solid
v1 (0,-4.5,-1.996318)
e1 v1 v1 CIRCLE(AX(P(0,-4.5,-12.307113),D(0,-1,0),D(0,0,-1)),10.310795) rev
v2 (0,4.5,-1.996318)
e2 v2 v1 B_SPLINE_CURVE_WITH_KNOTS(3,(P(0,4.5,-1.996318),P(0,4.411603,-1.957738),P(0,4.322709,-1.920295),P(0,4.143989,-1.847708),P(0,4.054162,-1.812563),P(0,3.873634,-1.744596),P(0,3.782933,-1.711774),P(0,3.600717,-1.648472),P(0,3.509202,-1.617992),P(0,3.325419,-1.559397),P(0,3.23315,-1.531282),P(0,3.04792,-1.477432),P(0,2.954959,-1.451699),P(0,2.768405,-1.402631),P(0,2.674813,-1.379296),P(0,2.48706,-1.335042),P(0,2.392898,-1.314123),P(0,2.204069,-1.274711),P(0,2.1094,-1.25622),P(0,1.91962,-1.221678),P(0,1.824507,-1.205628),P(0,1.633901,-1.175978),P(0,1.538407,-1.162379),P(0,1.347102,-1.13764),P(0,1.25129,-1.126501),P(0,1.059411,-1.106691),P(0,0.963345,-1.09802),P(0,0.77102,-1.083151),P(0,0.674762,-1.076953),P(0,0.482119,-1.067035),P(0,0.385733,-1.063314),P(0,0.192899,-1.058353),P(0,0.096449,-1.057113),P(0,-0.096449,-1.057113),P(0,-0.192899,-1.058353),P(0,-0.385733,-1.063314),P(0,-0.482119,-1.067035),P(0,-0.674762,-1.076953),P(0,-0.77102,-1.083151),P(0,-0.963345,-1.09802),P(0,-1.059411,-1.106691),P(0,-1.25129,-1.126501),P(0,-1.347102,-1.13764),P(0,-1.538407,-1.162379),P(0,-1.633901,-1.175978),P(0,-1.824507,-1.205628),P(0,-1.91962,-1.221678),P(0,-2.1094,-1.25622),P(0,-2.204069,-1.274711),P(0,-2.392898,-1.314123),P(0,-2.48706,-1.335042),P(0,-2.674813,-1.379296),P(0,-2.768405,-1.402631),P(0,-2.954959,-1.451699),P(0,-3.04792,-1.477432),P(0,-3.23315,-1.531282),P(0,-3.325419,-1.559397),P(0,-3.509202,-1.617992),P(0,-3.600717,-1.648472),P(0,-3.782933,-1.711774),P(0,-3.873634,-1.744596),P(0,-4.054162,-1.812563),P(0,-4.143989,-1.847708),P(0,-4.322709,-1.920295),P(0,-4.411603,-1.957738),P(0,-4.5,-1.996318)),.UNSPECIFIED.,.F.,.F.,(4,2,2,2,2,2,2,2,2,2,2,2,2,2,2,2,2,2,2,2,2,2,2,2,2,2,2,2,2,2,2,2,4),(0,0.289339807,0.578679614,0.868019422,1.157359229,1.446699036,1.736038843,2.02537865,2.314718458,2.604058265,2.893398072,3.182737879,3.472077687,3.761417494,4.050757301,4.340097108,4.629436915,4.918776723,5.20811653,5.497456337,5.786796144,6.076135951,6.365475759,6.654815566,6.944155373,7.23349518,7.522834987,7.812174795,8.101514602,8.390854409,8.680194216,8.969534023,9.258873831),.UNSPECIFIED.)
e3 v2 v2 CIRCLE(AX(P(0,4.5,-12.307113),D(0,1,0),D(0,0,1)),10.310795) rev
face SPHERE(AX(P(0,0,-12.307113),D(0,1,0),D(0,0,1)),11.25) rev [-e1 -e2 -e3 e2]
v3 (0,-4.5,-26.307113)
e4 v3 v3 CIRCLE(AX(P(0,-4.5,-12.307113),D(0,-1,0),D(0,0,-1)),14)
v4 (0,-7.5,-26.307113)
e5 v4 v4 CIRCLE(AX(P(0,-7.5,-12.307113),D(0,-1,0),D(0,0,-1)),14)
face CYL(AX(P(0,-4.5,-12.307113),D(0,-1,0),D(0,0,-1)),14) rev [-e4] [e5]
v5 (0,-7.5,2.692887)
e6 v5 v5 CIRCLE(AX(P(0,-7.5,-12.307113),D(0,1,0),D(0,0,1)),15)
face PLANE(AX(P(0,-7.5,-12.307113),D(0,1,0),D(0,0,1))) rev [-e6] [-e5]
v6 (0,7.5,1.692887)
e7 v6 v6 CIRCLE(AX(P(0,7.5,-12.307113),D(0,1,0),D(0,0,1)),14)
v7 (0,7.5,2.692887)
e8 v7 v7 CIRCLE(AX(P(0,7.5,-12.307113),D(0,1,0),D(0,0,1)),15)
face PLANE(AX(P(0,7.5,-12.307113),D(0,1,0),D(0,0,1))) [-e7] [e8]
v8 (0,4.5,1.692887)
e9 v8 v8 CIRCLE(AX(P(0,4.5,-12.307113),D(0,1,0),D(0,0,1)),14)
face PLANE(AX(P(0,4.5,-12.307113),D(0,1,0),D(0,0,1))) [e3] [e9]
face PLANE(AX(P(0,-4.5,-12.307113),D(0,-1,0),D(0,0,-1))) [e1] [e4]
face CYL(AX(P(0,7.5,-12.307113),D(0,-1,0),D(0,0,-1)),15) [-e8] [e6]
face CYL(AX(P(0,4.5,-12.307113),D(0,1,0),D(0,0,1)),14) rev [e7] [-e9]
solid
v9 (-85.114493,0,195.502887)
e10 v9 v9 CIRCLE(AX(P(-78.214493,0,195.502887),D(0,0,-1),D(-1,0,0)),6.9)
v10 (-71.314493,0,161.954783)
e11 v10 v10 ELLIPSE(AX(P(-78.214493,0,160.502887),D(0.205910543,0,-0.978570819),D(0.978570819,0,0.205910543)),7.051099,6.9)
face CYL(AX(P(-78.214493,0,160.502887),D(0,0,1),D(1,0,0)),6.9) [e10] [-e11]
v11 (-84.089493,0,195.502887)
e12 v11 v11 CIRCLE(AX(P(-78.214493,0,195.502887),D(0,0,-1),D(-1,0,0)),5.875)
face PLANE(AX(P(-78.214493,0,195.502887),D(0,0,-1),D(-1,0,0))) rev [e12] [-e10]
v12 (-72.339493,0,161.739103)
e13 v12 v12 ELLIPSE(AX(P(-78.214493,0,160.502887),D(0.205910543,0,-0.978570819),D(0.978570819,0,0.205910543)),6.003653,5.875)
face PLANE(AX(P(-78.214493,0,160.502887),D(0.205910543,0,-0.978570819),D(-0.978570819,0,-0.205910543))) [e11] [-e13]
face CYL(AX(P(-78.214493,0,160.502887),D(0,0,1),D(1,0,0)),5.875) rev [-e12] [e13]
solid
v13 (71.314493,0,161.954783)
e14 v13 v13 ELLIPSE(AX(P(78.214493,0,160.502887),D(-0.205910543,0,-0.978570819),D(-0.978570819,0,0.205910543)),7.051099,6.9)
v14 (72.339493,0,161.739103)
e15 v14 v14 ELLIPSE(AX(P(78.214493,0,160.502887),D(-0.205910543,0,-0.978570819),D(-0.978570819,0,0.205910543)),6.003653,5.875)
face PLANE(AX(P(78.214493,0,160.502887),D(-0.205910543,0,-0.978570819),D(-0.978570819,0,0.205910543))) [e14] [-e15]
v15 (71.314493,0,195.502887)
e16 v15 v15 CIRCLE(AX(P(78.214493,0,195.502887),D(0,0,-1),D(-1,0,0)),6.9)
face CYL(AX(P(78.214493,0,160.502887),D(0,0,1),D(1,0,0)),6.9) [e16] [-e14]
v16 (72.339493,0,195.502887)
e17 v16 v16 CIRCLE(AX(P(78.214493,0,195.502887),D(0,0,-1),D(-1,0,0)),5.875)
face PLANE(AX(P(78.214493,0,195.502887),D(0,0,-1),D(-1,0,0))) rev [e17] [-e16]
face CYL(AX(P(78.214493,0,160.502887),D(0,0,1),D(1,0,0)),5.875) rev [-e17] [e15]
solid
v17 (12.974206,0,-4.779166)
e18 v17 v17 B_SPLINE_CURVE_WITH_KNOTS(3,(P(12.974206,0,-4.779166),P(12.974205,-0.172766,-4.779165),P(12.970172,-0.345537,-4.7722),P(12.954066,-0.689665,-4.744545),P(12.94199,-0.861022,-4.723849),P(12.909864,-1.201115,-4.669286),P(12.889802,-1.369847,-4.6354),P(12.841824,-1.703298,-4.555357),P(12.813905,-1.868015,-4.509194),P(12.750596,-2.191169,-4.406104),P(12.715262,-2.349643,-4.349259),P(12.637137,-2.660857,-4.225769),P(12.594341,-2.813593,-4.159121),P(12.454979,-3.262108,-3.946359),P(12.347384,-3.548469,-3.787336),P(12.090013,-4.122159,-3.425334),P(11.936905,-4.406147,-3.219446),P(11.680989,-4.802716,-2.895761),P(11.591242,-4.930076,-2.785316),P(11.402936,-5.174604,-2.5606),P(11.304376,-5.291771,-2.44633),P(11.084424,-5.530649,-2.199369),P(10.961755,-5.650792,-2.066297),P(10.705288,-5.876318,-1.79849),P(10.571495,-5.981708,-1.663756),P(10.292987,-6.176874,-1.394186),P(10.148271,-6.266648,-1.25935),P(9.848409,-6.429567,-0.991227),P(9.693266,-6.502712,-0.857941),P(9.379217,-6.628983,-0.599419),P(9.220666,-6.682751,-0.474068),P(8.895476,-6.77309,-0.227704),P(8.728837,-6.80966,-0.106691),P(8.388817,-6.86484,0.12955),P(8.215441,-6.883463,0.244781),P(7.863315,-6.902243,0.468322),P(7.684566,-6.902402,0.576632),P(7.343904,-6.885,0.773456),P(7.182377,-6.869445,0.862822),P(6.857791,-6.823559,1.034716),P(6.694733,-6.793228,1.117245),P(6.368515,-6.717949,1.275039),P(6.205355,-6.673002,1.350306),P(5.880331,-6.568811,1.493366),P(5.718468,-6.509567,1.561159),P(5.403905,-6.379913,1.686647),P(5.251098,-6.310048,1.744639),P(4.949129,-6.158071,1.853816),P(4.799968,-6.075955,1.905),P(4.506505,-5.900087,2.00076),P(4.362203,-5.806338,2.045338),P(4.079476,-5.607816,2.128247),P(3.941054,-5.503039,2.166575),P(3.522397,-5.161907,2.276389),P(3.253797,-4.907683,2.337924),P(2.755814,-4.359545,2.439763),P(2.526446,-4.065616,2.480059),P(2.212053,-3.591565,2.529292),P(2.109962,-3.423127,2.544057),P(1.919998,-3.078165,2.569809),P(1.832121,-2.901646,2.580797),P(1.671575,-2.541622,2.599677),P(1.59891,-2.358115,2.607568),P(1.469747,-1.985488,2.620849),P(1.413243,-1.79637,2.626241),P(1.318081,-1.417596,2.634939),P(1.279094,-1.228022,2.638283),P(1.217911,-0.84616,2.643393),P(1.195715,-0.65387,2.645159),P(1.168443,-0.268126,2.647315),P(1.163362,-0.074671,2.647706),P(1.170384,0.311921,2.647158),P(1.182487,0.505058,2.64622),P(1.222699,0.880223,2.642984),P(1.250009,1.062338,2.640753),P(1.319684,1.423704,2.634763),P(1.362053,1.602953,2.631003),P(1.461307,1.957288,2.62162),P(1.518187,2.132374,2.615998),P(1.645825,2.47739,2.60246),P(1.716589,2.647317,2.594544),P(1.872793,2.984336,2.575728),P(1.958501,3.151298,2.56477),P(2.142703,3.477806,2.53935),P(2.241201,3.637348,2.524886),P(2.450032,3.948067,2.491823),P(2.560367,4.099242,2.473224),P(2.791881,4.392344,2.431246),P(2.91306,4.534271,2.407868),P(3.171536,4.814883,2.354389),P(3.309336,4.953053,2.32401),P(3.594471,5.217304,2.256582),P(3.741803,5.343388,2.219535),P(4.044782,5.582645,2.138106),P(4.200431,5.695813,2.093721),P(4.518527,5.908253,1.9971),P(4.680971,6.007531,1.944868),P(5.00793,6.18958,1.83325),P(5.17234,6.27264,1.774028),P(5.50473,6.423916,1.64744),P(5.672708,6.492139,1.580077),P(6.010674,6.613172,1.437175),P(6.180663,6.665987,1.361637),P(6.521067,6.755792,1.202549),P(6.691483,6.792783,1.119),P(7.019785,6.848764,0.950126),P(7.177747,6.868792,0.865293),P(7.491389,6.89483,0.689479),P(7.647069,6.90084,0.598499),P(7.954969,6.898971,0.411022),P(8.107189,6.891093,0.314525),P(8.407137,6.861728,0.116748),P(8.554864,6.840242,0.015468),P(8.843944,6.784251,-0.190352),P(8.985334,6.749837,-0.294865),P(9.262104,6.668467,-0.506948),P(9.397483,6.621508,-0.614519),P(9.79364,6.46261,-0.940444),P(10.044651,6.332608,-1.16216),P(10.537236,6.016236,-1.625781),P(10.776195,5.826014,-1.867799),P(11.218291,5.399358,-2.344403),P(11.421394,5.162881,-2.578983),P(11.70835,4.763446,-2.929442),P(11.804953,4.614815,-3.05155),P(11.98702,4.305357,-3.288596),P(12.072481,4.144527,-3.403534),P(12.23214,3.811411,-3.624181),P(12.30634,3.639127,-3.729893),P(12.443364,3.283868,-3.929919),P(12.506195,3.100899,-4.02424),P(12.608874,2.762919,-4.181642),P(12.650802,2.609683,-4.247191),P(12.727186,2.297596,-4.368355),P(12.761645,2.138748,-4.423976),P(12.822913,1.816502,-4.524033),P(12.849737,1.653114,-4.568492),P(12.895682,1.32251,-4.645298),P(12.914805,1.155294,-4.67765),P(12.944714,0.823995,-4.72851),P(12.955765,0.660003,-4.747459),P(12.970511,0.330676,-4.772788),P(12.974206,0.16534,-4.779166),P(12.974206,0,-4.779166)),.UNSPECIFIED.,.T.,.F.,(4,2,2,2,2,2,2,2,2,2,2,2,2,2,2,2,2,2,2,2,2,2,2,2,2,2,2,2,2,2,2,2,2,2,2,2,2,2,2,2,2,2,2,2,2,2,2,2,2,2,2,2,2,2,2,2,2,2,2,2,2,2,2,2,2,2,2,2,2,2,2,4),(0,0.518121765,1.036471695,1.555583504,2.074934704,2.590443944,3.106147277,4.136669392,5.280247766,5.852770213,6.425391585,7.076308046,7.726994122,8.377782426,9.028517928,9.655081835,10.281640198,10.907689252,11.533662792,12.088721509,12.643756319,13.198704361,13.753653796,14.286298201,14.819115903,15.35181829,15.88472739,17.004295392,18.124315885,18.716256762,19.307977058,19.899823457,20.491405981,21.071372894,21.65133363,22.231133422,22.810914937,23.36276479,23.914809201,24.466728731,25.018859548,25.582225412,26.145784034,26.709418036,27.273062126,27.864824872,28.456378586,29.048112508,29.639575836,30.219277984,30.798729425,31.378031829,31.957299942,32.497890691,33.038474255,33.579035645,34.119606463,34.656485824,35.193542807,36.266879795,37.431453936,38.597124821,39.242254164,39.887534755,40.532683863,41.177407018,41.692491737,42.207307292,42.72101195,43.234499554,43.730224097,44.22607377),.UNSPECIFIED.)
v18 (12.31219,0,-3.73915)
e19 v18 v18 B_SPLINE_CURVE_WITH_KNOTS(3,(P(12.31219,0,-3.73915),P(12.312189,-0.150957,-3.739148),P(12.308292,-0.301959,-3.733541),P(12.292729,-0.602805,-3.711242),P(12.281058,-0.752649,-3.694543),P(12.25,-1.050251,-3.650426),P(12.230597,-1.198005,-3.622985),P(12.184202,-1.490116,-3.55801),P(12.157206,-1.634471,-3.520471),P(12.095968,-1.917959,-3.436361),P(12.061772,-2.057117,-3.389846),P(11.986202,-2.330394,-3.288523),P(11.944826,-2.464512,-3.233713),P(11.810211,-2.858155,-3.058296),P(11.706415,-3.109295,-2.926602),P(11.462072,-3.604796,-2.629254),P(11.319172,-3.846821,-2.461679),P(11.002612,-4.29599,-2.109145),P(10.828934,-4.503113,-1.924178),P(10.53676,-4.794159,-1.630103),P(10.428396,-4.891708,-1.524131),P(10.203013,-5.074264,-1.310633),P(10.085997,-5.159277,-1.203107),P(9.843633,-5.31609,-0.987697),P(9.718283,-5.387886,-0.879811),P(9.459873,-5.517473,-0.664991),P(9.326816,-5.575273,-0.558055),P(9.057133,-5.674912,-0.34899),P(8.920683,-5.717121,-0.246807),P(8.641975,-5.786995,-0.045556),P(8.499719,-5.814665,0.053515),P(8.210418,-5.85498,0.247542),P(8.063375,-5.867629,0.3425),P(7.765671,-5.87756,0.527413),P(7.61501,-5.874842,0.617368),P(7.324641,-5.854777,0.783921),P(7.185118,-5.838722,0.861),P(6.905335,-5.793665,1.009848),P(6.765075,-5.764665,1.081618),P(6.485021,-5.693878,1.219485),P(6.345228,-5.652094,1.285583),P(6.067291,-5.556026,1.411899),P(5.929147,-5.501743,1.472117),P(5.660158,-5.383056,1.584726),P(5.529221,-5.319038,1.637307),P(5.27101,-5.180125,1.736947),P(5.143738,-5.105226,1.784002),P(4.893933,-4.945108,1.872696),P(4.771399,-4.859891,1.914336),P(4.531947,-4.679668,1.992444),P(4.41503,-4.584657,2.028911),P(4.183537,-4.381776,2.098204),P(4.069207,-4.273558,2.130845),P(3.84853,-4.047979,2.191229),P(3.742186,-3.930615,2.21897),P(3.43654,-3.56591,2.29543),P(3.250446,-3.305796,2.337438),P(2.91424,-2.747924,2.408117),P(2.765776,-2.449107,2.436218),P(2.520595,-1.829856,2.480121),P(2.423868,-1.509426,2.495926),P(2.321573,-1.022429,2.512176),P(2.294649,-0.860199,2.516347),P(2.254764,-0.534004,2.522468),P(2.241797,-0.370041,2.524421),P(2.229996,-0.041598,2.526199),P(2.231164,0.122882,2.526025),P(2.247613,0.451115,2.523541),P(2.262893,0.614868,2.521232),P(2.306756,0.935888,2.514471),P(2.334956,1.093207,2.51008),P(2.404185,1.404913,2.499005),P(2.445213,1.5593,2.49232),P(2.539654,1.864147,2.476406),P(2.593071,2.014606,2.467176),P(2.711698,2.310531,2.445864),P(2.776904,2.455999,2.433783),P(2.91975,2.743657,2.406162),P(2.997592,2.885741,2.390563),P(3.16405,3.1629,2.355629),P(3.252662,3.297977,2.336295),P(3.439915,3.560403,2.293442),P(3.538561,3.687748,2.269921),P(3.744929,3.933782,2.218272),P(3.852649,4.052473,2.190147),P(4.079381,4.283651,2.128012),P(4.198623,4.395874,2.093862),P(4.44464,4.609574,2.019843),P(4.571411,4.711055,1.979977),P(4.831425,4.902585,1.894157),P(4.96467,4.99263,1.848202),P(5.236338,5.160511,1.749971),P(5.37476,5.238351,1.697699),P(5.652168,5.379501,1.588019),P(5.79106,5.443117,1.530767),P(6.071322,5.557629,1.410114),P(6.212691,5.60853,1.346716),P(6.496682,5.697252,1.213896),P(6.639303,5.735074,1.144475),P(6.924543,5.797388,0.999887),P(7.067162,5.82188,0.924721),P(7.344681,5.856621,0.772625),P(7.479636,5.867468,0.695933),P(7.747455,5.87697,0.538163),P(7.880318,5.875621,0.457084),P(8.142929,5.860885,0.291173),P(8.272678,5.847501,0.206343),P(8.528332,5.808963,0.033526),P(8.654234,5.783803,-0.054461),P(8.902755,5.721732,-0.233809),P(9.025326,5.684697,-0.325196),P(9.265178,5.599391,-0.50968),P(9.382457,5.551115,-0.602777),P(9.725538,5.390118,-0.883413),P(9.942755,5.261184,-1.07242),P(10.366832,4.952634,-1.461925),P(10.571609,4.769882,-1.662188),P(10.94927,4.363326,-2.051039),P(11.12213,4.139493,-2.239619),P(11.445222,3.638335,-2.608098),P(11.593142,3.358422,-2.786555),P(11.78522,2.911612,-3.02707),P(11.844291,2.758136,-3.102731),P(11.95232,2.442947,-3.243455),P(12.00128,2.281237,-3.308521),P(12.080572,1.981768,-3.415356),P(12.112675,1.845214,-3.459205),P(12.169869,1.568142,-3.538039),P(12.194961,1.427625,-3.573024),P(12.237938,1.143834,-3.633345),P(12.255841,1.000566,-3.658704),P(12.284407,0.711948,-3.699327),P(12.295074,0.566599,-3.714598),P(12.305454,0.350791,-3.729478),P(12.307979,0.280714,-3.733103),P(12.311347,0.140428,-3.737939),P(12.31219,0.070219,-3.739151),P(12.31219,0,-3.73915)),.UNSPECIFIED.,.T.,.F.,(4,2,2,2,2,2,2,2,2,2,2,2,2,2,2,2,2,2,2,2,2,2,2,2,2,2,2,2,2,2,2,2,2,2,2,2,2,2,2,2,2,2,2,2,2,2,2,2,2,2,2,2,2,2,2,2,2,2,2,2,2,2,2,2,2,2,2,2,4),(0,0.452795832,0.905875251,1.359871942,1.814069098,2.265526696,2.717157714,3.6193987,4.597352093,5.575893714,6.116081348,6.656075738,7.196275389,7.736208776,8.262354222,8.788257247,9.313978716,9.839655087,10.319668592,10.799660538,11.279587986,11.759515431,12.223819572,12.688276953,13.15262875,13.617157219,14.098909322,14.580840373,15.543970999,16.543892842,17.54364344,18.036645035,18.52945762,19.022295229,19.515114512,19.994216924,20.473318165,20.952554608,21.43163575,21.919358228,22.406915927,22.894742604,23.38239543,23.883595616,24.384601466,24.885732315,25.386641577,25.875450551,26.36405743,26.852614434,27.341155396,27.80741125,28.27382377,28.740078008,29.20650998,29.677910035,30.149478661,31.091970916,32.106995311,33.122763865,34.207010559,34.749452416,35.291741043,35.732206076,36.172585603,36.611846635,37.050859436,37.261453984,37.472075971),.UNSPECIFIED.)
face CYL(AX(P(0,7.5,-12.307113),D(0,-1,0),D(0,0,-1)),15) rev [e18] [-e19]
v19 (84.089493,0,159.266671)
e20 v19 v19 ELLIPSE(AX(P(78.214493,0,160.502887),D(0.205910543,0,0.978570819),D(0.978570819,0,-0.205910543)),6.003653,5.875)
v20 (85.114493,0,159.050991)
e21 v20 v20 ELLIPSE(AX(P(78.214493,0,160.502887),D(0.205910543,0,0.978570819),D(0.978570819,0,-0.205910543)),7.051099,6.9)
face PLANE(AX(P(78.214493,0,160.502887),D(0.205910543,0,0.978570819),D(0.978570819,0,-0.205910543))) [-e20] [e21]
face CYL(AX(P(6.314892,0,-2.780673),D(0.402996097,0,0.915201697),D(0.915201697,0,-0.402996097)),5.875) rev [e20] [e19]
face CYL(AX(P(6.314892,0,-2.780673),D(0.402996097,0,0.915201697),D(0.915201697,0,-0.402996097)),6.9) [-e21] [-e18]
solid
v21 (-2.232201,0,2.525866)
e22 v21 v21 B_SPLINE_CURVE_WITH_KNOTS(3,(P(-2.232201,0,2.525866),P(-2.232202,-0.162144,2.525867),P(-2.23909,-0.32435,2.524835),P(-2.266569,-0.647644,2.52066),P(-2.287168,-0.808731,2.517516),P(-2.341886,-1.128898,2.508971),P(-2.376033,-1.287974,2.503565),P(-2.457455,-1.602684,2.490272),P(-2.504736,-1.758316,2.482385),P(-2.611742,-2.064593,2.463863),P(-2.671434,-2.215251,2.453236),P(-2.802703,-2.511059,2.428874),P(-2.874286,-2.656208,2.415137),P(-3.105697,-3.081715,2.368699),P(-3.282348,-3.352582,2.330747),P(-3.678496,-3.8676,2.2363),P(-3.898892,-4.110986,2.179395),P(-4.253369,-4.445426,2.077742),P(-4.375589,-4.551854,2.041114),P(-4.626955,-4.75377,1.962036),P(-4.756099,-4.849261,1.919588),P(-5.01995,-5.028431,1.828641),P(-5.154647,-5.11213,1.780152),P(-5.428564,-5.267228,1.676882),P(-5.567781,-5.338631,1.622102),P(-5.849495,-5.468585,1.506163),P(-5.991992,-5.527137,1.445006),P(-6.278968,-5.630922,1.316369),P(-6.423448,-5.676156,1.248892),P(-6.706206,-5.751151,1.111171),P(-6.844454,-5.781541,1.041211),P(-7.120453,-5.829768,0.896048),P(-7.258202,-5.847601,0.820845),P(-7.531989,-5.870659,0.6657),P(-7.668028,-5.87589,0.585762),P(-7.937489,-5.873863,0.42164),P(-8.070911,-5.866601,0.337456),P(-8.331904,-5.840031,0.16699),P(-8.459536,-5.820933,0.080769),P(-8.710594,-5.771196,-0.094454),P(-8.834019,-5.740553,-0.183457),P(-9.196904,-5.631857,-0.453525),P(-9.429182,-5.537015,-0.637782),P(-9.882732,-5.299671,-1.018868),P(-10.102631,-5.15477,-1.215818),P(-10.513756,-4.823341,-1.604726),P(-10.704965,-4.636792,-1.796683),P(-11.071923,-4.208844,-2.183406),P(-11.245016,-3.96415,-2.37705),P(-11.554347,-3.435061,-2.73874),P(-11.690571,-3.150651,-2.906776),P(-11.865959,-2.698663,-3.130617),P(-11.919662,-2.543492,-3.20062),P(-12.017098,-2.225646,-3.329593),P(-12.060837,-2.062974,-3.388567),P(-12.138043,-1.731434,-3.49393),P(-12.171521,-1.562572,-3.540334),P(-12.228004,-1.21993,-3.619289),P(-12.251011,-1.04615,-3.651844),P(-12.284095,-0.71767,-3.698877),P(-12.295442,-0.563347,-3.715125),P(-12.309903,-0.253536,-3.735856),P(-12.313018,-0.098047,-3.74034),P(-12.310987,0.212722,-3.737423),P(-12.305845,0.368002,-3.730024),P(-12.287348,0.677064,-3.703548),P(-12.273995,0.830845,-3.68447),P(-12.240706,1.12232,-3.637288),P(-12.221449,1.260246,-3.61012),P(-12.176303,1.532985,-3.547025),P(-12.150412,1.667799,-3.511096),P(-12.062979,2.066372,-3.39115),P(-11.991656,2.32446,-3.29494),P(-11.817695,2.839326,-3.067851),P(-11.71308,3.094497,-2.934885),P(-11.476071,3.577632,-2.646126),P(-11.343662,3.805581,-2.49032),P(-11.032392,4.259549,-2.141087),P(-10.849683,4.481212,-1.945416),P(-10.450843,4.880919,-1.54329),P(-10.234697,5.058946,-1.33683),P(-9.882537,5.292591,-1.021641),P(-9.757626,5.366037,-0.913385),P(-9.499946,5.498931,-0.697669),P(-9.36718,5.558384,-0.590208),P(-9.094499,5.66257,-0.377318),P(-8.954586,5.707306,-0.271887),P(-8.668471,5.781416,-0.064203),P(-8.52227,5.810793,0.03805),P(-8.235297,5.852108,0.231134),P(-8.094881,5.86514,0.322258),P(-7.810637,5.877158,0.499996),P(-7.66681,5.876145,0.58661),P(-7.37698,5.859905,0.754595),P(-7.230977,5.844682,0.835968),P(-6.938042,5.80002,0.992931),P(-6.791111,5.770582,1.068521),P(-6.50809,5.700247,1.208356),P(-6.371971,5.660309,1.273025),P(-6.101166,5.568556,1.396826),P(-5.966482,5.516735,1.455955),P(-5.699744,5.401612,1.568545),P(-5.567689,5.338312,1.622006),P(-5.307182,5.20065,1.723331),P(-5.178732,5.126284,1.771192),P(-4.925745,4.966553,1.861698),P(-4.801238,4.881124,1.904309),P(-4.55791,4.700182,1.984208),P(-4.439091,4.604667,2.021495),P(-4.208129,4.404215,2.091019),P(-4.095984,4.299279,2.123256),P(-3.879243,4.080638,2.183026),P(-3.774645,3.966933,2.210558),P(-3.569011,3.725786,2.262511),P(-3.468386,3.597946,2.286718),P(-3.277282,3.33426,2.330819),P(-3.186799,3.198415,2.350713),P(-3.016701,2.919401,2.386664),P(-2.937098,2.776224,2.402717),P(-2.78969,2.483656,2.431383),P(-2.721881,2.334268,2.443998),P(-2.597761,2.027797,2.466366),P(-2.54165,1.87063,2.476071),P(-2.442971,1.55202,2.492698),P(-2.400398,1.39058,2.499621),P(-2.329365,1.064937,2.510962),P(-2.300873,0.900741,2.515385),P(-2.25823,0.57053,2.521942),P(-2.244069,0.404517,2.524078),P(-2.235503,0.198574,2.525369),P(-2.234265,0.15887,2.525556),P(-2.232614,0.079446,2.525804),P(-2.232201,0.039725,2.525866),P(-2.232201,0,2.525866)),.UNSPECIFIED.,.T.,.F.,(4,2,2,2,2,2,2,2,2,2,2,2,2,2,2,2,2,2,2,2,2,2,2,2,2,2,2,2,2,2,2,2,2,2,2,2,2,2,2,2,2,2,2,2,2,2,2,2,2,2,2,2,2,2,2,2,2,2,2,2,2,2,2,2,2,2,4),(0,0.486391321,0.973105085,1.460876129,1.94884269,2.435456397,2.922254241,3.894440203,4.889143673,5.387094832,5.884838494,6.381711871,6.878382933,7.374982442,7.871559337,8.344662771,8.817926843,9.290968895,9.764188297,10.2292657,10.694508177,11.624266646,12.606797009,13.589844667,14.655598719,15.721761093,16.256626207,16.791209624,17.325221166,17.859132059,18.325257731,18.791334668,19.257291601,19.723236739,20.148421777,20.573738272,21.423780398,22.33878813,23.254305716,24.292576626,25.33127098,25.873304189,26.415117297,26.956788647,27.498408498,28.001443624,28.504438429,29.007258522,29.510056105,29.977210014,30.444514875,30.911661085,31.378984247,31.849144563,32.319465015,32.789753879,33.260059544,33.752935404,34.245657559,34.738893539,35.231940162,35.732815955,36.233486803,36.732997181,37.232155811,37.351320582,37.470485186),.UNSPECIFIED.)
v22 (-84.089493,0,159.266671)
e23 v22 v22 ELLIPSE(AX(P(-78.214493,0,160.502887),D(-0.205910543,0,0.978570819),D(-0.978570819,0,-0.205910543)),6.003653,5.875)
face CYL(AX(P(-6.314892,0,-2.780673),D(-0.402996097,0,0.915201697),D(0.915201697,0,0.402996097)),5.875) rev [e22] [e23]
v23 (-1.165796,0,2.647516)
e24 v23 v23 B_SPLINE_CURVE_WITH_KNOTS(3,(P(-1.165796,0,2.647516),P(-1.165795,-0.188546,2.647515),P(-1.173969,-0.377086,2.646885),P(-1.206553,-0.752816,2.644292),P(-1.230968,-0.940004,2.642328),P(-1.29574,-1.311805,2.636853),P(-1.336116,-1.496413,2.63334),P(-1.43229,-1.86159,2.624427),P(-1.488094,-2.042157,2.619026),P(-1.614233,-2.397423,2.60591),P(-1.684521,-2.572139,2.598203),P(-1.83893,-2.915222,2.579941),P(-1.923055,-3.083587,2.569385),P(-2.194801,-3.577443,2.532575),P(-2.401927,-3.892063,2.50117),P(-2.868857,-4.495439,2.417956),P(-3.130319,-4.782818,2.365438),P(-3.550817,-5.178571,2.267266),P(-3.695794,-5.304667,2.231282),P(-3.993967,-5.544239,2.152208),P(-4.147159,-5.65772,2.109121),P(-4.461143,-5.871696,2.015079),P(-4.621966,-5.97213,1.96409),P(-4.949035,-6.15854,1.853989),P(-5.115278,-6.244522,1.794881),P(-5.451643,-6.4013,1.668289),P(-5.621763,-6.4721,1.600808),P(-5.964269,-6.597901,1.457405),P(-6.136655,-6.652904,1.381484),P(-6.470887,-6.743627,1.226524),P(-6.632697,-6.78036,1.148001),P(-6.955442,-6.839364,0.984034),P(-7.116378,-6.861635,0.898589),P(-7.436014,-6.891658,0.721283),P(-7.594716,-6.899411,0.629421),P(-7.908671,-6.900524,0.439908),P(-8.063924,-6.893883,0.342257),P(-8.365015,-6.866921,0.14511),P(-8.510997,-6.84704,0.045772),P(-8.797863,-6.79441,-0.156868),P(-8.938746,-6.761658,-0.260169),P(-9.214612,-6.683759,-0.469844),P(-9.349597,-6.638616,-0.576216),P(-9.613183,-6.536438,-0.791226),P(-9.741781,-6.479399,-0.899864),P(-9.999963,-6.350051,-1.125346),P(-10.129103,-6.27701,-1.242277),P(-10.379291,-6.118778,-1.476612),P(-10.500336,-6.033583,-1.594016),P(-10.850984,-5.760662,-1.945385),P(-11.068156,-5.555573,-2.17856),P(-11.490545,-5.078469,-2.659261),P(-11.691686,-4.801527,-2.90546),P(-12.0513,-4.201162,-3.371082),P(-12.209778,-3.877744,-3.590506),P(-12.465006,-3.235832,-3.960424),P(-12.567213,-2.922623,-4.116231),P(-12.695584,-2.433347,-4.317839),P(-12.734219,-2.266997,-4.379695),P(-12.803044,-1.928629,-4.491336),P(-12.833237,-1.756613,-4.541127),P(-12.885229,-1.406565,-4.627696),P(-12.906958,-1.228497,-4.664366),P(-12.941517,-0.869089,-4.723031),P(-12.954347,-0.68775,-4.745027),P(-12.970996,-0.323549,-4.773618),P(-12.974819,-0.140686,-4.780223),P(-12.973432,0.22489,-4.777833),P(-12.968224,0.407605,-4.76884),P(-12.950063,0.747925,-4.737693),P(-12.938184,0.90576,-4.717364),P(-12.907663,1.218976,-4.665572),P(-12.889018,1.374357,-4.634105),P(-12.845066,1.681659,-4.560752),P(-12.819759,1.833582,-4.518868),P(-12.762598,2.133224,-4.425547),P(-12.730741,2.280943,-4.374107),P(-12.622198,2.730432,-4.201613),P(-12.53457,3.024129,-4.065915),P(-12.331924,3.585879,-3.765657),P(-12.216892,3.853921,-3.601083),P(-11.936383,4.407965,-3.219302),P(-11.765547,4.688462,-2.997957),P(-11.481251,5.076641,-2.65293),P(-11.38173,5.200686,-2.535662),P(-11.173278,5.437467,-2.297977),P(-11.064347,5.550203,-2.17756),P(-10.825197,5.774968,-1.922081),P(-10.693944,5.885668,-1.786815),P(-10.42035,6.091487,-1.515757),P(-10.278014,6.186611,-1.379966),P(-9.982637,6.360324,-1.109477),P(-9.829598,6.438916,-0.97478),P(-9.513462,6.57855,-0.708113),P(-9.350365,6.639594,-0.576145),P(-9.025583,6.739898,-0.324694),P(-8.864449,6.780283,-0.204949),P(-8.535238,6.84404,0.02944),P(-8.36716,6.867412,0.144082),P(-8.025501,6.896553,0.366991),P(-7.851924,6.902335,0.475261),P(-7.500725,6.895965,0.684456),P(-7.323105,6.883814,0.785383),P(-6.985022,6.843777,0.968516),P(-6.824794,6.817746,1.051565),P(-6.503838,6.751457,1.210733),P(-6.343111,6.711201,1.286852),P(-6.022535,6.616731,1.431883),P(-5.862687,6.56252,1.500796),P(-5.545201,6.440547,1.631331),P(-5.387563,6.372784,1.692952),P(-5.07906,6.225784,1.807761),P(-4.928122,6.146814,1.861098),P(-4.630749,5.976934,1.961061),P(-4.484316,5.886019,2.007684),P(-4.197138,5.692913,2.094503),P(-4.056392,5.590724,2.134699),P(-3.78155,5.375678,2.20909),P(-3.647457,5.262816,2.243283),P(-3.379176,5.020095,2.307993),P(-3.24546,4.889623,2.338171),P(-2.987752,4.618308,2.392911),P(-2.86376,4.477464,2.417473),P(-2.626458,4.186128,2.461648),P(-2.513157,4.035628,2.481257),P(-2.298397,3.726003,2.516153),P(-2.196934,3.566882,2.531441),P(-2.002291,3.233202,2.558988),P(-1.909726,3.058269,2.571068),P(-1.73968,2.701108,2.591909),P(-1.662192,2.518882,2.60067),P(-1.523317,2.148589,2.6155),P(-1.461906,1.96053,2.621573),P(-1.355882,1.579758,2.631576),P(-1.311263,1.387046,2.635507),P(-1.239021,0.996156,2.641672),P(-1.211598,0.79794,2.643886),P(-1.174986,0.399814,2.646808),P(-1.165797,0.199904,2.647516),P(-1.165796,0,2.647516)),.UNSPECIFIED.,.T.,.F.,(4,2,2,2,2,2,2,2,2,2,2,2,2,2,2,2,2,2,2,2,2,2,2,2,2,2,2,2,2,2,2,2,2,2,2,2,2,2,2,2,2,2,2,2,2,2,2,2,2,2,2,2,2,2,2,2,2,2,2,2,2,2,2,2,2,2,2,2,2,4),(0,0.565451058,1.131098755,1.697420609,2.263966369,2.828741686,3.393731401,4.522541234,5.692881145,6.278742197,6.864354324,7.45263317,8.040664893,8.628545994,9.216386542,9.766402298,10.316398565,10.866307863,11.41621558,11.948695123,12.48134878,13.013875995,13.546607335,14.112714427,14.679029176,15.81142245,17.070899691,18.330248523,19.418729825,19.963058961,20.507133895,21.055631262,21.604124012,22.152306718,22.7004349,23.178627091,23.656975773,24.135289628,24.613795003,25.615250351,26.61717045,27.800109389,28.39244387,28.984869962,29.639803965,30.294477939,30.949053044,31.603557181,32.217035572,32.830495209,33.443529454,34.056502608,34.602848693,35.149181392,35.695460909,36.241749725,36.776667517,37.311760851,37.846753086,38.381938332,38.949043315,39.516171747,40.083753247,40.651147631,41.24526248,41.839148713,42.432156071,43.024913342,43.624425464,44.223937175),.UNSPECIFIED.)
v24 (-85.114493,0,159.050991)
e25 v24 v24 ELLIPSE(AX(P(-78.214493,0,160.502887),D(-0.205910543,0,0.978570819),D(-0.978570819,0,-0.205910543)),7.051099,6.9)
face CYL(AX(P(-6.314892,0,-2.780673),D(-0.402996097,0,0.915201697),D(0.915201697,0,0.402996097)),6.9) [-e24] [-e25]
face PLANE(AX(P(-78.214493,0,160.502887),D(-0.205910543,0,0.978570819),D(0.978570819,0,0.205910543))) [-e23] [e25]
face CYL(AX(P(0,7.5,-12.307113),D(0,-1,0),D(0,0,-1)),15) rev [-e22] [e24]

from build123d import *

# Parameters (mm, degrees)
SKETCH1_ON_SEGMENT_1_R                  = 6.9
SKETCH1_ON_SEGMENT_1_R_2                = 5.875
CIRCULAR_TUBE_21_3_X_2_3_1_DEPTH        = 38.053290561
CIRCULAR_TUBE_21_3_X_2_3_1_2_DEPTH      = 178.412650039
CIRCULAR_TUBE_21_3_X_2_3_1_2_DEPTH_BACK = 3.053290561
SKETCH1_R                               = 6.9
SKETCH1_R_2                             = 5.875
SKETCH11_ON_SEGMENT_1_R                 = 6.9
SKETCH11_ON_SEGMENT_1_R_2               = 5.875
CIRCULAR_TUBE_21_3_X_2_3_2_DEPTH        = 38.053290561
CIRCULAR_TUBE_21_3_X_2_3_2_2_DEPTH      = 178.412650039
CIRCULAR_TUBE_21_3_X_2_3_2_2_DEPTH_BACK = 3.053290561
SKETCH11_R                              = 6.9
SKETCH11_R_2                            = 5.875
SKETCH_1_R                              = 15
EXTRUDE_1_DEPTH                         = 7.5
SKETCH_5_R                              = 14
CUT_EXTRUDE_1_DEPTH                     = 3
SKETCH_7_R                              = 14
CUT_EXTRUDE_2_DEPTH                     = 3
WELD_START                              = -8
WELD_TRIM_4_DEPTH                       = 16
WELD_TRIM_4_2_DEPTH                     = 16


with BuildPart() as part:
    # Sketch1 on segment 1 (carried to segment 1) → Circular tube 21.3 X 2.3(1) (new body)
    with BuildSketch(Plane(origin=(-78.21449332, 0, 195.502886979), x_dir=(-1, 0, 0), z_dir=(0, 0, -1))):
        Circle(SKETCH1_ON_SEGMENT_1_R)
        Circle(SKETCH1_ON_SEGMENT_1_R_2, mode=Mode.SUBTRACT)
    extrude(amount=CIRCULAR_TUBE_21_3_X_2_3_1_DEPTH)

    # Circular tube 21.3 X 2.3(1) mitre 1
    split(bisect_by=Plane(origin=(-78.21449332, 0, 160.502886979), x_dir=(0, -1, 0), z_dir=(-0.205910543, 0, 0.978570819)), keep=Keep.TOP)


with BuildPart() as body_2:
    # Sketch1 → Circular tube 21.3 X 2.3_1 2 (new, two sides: drawn at the far end of the back side and taken through both)
    with BuildSketch(Plane(origin=(-78.21449332, 0, 160.502886979), x_dir=(-0.9152016968098962, 0, -0.4029960969491974), z_dir=(0.4029960969491974, 0, -0.9152016968098962)).offset(-CIRCULAR_TUBE_21_3_X_2_3_1_2_DEPTH_BACK)):
        Circle(SKETCH1_R)
        Circle(SKETCH1_R_2, mode=Mode.SUBTRACT)
    extrude(amount=CIRCULAR_TUBE_21_3_X_2_3_1_2_DEPTH + CIRCULAR_TUBE_21_3_X_2_3_1_2_DEPTH_BACK)

    # Circular tube 21.3 X 2.3_1 2 mitre 1
    split(bisect_by=Plane(origin=(-78.21449332, 0, 160.502886979), x_dir=(0, 1, 0), z_dir=(0.205910543, 0, -0.978570819)), keep=Keep.TOP)


with BuildPart() as body_3:
    # Sketch11 on segment 1 (carried to segment 1) → Circular tube 21.3 X 2.3(2) (new body)
    with BuildSketch(Plane(origin=(78.21449332, 0, 195.502886979), x_dir=(-1, 0, 0), z_dir=(0, 0, -1))):
        Circle(SKETCH11_ON_SEGMENT_1_R)
        Circle(SKETCH11_ON_SEGMENT_1_R_2, mode=Mode.SUBTRACT)
    extrude(amount=CIRCULAR_TUBE_21_3_X_2_3_2_DEPTH)

    # Circular tube 21.3 X 2.3(2) mitre 1
    split(bisect_by=Plane(origin=(78.21449332, 0, 160.502886979), x_dir=(0, -1, 0), z_dir=(0.205910543, 0, 0.978570819)), keep=Keep.TOP)


with BuildPart() as body_4:
    # Sketch11 → Circular tube 21.3 X 2.3_2 2 (new, two sides: drawn at the far end of the back side and taken through both)
    with BuildSketch(Plane(origin=(78.21449332, 0, 160.502886979), x_dir=(-0.9152016968098962, 0, 0.40299609694919775), z_dir=(-0.40299609694919775, 0, -0.9152016968098962)).offset(-CIRCULAR_TUBE_21_3_X_2_3_2_2_DEPTH_BACK)):
        Circle(SKETCH11_R)
        Circle(SKETCH11_R_2, mode=Mode.SUBTRACT)
    extrude(amount=CIRCULAR_TUBE_21_3_X_2_3_2_2_DEPTH + CIRCULAR_TUBE_21_3_X_2_3_2_2_DEPTH_BACK)

    # Circular tube 21.3 X 2.3_2 2 mitre 1
    split(bisect_by=Plane(origin=(78.21449332, 0, 160.502886979), x_dir=(0, 1, 0), z_dir=(-0.205910543, 0, -0.978570819)), keep=Keep.TOP)


with BuildPart() as body_5:
    # 스케치1 → 보스-돌출1 (new, symmetric)
    with BuildSketch(Plane(origin=(0, 0, 0), x_dir=(1, 0, 0), z_dir=(0, 1, 0))):
        with Locations(Location((0, 12.307113021, 0), (0, 0, 270))):
            Circle(SKETCH_1_R)
    extrude(amount=EXTRUDE_1_DEPTH, both=True)


with BuildPart() as cut_extrude_1_tool:
    # 스케치5 → 컷-돌출1 (new body)
    with BuildSketch(Plane(origin=(0, 7.5, 0), x_dir=(1, 0, 0), z_dir=(0, 1, 0))):
        with Locations(Location((0, 12.307113021, 0), (0, 0, 270))):
            Circle(SKETCH_5_R)
    extrude(amount=-CUT_EXTRUDE_1_DEPTH)


with BuildPart() as body_2_1:
    add(body_2.part)

    # 컷-돌출1: cut by cut_extrude_1_tool
    add(cut_extrude_1_tool.part, mode=Mode.SUBTRACT)


with BuildPart() as body_4_1:
    add(body_4.part)

    # 컷-돌출1: cut by cut_extrude_1_tool
    add(cut_extrude_1_tool.part, mode=Mode.SUBTRACT)


with BuildPart() as body_5_1:
    add(body_5.part)

    # 컷-돌출1: cut by cut_extrude_1_tool
    add(cut_extrude_1_tool.part, mode=Mode.SUBTRACT)


with BuildPart() as cut_extrude_2_tool:
    # 스케치7 → 컷-돌출2 (new body)
    with BuildSketch(Plane.XZ.offset(7.5)):
        with Locations(Location((0, -12.307113021, 0), (0, 0, 90))):
            Circle(SKETCH_7_R)
    extrude(amount=-CUT_EXTRUDE_2_DEPTH)


with BuildPart() as body_2_2:
    add(body_2_1.part)

    # 컷-돌출2: cut by cut_extrude_2_tool
    add(cut_extrude_2_tool.part, mode=Mode.SUBTRACT)

    # Weld Trim 4 2 outline → Weld Trim 4 2 (cut)
    with BuildSketch(Plane(origin=(0, 0, 0), x_dir=(1, 0, 0), z_dir=(0, 1, 0)).offset(WELD_START)):
        with BuildLine():
            ThreePointArc((-12.974565083, 4.779785413), (-7.986153794, -0.39018384), (-1.165795873, -2.647515694))
            Line((-1.165795873, -2.647515694), (1, -2.81635144))
            Line((1, -2.81635144), (1, -0.440335828))
            Line((1, -0.440335828), (0, 0))
            Line((0, 0), (-2.858187499, 1.258562359))
            Line((-2.858187499, 1.258562359), (-9.771595917, 4.302783779))
            Line((-9.771595917, 4.302783779), (-12.629783416, 5.561346138))
            Line((-12.629783416, 5.561346138), (-13.701878842, 6.033428165))
            Line((-13.701878842, 6.033428165), (-12.974565083, 4.779785413))
        make_face()
    extrude(amount=WELD_TRIM_4_2_DEPTH, mode=Mode.SUBTRACT)


with BuildPart() as body_4_2:
    add(body_4_1.part)

    # 컷-돌출2: cut by cut_extrude_2_tool
    add(cut_extrude_2_tool.part, mode=Mode.SUBTRACT)

    # Weld Trim 4: read off the stored shape, not the designer's step
    # Weld Trim 4 outline → Weld Trim 4 (cut)
    with BuildSketch(Plane(origin=(0, 0, 0), x_dir=(1, 0, 0), z_dir=(0, 1, 0)).offset(WELD_START)):
        with BuildLine():
            ThreePointArc((1.165186055, -2.64756322), (7.985591704, -0.390537358), (12.974205579, 4.779165784))
            Line((12.974205579, 4.779165784), (13.701986356, 6.033475507))
            Line((13.701986356, 6.033475507), (12.629783416, 5.561346138))
            Line((12.629783416, 5.561346138), (9.771595917, 4.302783779))
            Line((9.771595917, 4.302783779), (2.858187499, 1.258562359))
            Line((2.858187499, 1.258562359), (0, 0))
            Line((0, 0), (-1, -0.440335828))
            Line((-1, -0.440335828), (-1, -2.816262599))
            Line((-1, -2.816262599), (1.165186055, -2.64756322))
        make_face()
    extrude(amount=WELD_TRIM_4_DEPTH, mode=Mode.SUBTRACT)


with BuildPart() as body_5_2:
    add(body_5_1.part)

    # 컷-돌출2: cut by cut_extrude_2_tool
    add(cut_extrude_2_tool.part, mode=Mode.SUBTRACT)

    # 스케치9 → 컷-회전1 (revolve, cut)
    with BuildSketch(Plane(origin=(0, 0, 0), x_dir=(0, 0, -1), z_dir=(1, 0, 0))):
        with BuildLine():
            Line((12.307113021, -11.25), (12.307113021, 11.25))
            ThreePointArc((12.307113021, 11.25), (23.557113021, 0), (12.307113021, -11.25))
        make_face()
    revolve(axis=Axis((0, 7.5, -12.307113021), (0, -1, 0)), mode=Mode.SUBTRACT)


solid = Compound([part.part, body_3.part, body_2_2.part, body_4_2.part, body_5_2.part])
